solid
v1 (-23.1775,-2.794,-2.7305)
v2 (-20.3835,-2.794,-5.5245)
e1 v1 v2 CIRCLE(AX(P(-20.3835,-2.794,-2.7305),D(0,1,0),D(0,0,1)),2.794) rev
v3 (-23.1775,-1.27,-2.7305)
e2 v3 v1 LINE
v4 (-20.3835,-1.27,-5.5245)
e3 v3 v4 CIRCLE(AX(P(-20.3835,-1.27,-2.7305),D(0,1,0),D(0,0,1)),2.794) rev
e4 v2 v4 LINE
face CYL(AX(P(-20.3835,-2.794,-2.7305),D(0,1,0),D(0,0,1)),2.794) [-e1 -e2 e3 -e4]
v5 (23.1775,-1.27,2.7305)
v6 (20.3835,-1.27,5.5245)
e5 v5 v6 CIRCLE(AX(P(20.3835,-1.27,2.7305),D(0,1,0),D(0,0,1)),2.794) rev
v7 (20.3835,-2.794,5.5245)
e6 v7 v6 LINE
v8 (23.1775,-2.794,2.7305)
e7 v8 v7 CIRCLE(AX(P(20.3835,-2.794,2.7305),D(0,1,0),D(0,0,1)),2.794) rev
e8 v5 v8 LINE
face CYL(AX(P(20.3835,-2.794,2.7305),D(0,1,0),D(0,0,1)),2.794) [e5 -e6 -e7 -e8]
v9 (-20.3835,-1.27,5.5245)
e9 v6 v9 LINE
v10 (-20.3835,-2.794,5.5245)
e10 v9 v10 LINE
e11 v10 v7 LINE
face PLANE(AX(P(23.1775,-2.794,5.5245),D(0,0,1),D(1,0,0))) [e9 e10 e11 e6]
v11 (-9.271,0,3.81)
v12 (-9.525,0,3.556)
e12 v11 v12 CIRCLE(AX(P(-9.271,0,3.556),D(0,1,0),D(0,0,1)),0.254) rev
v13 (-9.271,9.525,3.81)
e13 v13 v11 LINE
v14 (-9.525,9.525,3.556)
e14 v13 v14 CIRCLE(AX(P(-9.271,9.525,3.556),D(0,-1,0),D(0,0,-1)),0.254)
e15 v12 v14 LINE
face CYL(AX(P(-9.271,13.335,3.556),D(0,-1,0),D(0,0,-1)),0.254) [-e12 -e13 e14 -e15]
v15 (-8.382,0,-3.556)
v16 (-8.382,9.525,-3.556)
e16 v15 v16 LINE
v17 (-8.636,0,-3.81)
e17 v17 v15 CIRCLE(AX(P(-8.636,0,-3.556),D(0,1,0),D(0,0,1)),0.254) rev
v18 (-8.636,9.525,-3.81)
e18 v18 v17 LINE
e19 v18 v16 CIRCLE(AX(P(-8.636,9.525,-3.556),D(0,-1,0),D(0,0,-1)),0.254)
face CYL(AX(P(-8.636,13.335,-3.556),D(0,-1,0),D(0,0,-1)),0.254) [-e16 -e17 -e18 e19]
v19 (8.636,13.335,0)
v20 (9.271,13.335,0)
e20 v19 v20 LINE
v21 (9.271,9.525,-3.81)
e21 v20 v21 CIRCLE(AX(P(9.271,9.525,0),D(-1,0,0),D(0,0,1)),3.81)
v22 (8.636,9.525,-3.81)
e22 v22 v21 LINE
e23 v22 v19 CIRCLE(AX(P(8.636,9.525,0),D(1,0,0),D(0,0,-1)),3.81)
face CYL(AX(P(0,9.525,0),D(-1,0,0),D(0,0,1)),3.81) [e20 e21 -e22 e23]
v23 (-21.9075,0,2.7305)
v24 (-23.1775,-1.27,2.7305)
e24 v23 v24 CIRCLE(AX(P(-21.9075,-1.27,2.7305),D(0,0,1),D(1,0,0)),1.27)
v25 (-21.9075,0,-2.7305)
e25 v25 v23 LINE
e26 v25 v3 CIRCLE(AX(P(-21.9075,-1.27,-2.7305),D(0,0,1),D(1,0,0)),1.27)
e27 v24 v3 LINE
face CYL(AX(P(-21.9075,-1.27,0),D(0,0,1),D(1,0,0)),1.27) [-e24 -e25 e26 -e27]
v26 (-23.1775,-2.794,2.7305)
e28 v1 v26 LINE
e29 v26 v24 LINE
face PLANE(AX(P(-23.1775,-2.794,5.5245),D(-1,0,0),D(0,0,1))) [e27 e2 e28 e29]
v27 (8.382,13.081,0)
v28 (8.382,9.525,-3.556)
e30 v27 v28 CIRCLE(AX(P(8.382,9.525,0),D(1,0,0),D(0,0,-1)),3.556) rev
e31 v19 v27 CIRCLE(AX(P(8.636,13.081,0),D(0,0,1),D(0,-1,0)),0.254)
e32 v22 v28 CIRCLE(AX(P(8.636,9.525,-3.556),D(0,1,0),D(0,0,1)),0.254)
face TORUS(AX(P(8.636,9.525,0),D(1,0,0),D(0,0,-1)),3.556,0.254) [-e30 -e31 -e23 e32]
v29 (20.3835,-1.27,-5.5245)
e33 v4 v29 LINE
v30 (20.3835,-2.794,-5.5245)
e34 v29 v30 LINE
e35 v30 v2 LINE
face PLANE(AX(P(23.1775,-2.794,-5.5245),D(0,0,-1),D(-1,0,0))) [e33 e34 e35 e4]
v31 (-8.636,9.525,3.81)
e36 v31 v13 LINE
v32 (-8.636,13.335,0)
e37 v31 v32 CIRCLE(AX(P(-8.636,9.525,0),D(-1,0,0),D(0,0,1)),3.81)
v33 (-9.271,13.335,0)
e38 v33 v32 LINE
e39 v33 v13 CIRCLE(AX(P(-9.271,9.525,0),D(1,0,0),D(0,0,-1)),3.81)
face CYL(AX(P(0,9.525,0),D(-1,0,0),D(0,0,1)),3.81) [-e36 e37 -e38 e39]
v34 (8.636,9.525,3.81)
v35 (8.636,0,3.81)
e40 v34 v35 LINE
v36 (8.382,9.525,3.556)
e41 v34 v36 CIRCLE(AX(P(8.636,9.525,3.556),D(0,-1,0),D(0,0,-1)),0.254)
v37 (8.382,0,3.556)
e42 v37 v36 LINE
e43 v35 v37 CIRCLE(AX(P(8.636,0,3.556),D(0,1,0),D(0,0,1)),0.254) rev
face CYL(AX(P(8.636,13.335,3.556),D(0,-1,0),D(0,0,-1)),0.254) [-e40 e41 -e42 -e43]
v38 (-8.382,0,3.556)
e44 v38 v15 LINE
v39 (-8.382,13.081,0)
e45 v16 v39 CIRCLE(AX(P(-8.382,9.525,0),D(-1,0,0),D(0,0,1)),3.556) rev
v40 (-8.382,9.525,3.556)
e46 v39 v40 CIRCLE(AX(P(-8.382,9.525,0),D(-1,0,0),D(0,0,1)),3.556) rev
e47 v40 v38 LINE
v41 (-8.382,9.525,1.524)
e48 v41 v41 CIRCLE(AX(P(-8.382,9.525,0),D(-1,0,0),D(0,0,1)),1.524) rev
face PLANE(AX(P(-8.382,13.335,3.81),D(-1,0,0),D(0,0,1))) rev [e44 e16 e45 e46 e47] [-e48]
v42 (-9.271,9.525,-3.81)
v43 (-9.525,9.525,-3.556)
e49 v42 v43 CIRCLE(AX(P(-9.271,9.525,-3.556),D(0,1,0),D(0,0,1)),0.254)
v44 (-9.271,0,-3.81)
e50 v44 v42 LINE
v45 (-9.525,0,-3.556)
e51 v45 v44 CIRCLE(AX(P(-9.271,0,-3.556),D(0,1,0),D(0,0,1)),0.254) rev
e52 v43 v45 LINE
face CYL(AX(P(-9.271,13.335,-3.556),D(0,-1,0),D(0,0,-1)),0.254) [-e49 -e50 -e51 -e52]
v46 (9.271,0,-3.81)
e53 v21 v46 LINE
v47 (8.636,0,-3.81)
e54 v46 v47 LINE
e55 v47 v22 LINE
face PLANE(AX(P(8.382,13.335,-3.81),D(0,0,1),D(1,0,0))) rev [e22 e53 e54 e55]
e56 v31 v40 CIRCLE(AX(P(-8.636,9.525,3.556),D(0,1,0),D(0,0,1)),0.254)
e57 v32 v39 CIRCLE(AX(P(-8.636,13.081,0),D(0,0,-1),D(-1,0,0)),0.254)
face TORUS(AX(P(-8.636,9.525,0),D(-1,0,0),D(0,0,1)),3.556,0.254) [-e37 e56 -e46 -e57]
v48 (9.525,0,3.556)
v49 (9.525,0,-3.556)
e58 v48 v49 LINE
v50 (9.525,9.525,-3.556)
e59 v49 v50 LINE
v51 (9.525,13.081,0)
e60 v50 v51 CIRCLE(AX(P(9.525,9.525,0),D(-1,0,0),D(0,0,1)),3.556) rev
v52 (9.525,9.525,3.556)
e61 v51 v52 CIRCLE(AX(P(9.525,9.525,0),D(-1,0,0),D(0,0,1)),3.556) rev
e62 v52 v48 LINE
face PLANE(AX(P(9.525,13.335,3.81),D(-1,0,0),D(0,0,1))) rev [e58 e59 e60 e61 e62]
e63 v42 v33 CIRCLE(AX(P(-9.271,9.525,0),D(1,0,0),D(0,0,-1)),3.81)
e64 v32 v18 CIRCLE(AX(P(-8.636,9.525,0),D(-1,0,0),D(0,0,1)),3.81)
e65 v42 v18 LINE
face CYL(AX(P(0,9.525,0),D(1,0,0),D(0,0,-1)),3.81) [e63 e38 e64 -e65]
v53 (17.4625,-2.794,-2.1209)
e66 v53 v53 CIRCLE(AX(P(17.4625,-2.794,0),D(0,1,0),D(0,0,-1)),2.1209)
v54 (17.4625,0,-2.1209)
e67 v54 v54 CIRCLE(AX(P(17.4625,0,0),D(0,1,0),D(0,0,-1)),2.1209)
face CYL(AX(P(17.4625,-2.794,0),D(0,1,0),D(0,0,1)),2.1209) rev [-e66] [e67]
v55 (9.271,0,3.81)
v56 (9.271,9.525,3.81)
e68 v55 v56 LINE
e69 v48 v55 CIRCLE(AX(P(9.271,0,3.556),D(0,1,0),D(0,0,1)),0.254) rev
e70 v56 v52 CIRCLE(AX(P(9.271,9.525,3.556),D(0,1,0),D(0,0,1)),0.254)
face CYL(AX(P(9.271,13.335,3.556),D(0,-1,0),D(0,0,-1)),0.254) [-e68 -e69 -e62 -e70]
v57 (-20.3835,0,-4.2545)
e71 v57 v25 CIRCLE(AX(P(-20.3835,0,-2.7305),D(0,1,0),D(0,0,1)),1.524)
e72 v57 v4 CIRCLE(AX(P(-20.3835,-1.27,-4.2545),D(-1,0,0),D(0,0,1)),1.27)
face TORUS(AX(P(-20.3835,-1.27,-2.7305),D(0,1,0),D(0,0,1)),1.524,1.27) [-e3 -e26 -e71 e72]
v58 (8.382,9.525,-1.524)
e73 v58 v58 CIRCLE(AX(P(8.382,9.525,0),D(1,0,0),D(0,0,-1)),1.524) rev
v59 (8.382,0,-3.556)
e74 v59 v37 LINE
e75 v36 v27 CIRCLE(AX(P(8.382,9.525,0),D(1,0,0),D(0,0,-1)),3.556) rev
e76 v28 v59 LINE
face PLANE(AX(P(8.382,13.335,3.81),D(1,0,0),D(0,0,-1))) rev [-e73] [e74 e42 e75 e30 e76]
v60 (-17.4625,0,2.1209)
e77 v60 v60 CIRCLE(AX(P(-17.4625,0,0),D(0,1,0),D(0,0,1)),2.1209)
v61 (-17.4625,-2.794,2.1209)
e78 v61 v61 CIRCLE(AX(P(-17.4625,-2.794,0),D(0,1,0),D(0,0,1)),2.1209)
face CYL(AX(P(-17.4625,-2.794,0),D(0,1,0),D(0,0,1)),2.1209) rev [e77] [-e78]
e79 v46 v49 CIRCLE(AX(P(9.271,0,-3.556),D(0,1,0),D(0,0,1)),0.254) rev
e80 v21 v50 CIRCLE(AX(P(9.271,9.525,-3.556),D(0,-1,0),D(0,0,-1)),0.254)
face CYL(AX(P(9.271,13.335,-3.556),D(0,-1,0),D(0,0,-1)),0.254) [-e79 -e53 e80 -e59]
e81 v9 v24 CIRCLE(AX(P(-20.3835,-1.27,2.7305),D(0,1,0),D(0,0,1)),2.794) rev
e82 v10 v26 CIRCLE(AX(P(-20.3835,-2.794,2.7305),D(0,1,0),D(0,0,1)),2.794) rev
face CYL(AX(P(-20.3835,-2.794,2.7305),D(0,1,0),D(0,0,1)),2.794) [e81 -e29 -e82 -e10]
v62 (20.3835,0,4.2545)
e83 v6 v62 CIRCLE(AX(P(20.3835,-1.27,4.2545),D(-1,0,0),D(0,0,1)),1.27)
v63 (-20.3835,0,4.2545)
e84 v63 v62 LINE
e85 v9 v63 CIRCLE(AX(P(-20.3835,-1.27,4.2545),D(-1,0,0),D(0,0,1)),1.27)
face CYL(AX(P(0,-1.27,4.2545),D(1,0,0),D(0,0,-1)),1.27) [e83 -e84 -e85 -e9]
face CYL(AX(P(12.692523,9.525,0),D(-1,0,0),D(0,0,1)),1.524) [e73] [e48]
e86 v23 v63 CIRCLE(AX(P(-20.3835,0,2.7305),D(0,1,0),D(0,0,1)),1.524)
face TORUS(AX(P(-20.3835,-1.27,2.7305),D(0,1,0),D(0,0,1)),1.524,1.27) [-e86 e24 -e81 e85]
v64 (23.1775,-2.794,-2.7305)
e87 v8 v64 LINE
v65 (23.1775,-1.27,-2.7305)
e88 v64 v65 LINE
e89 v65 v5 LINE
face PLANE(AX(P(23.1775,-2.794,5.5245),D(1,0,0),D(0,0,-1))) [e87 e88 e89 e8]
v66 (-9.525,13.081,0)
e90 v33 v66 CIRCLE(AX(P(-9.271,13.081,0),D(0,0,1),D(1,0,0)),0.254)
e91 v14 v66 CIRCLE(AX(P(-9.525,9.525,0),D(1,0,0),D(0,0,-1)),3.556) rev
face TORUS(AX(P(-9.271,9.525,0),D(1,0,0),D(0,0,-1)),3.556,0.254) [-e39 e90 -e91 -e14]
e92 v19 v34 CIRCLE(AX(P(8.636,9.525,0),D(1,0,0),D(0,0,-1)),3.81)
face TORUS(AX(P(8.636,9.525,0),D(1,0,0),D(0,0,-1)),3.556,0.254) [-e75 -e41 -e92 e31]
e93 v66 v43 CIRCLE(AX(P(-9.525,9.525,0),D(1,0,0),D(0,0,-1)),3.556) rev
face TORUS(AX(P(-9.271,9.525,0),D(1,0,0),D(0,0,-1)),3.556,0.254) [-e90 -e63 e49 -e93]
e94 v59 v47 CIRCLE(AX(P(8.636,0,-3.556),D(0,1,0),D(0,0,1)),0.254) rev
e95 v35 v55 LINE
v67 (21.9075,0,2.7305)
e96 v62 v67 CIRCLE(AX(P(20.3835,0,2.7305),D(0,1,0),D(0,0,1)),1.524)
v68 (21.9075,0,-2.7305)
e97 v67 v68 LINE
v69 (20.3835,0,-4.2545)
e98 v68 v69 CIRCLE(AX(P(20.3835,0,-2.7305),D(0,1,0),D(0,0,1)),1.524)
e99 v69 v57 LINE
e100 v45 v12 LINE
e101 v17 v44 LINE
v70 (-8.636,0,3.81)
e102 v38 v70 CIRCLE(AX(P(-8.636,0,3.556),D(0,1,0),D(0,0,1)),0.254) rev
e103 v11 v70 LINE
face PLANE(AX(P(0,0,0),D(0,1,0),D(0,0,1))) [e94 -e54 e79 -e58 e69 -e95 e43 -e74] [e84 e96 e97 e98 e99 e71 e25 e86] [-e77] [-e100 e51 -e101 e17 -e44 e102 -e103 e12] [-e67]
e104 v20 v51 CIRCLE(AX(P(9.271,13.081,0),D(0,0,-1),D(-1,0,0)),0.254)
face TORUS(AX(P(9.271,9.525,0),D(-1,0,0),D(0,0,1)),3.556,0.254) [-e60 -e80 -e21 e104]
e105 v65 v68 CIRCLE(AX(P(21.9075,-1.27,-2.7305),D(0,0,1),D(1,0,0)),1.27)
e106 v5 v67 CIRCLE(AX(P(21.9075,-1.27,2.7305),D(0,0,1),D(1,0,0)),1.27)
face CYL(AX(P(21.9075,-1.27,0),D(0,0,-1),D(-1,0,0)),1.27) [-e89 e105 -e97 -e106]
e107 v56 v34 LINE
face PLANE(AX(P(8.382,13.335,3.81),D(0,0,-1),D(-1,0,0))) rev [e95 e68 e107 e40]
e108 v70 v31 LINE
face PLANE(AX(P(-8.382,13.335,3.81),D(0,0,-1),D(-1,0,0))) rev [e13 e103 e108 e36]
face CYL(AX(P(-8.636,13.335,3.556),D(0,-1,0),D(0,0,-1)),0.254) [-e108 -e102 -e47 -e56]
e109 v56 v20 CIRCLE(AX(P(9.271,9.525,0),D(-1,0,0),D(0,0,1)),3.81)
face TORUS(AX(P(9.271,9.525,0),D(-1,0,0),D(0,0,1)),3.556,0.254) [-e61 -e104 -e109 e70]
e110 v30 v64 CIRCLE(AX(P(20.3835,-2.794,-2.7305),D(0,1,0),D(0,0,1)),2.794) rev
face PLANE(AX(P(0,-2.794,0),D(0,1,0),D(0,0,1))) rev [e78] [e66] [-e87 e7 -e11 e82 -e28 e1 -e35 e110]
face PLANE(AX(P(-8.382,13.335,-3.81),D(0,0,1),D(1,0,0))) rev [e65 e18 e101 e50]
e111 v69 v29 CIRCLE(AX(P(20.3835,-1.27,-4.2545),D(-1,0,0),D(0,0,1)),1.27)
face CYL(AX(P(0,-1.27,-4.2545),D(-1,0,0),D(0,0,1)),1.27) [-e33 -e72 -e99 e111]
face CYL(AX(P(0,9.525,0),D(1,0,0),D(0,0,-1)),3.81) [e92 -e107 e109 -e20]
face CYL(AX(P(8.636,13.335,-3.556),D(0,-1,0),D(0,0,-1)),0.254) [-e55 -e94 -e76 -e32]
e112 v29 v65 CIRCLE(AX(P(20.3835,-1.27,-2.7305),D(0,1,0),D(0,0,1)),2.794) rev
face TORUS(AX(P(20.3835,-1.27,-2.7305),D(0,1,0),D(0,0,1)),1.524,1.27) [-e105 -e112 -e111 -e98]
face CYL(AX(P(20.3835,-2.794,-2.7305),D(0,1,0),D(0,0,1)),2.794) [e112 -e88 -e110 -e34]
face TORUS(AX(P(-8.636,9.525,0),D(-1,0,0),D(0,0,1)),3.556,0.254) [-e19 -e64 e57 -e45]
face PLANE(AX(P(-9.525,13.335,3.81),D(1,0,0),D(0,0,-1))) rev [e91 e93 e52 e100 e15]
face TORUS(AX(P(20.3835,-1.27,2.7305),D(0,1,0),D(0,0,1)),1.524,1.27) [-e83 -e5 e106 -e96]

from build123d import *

# Parameters (mm, degrees)
SKETCH1_W           = 46.355
SKETCH1_H           = 11.049
SKETCH1_R           = 2.1209
BOSS_EXTRUDE1_DEPTH = 2.794
SKETCH2_W           = 1.143
SKETCH2_H           = 7.62
BOSS_EXTRUDE2_DEPTH = 13.335
FILLET1_R           = 3.81
SKETCH3_R           = 1.524
BOSS_EXTRUDE3_DEPTH = 16.764
FILLET2_R           = 2.794
FILLET3_R           = 1.27
FILLET4_R           = 0.254


with BuildPart() as part:
    # Sketch1 → Boss-Extrude1 (new body)
    with BuildSketch(Plane(origin=(0, 0, 0), x_dir=(1, 0, 0), z_dir=(0, 1, 0))):
        Rectangle(SKETCH1_W, SKETCH1_H)
        with Locations(Location((-17.4625, 0, 0), (0, 0, 270))):
            Circle(SKETCH1_R, mode=Mode.SUBTRACT)
        with Locations(Location((17.4625, 0, 0), (0, 0, 90))):
            Circle(SKETCH1_R, mode=Mode.SUBTRACT)
    extrude(amount=-BOSS_EXTRUDE1_DEPTH)

    # Sketch2 → Boss-Extrude2 (add)
    with BuildSketch(Plane(origin=(0, 0, 0), x_dir=(1, 0, 0), z_dir=(0, 1, 0))):
        with Locations((8.9535, 0)):
            Rectangle(SKETCH2_W, SKETCH2_H)
        with Locations((-8.9535, 0)):
            Rectangle(SKETCH2_W, SKETCH2_H)
    extrude(amount=BOSS_EXTRUDE2_DEPTH)

    # Fillet1
    fillet1_edges = [part.edges().sort_by_distance(p)[0] for p in [
        (-8.9535, 13.335, -3.81),
        (-8.9535, 13.335, 3.81),
        (8.9535, 13.335, -3.81),
        (8.9535, 13.335, 3.81),
    ]]
    fillet(fillet1_edges, radius=FILLET1_R - 0.0001)  # a hair under: the kernel refuses the full size

    # Sketch3 → Boss-Extrude3 (add)
    with BuildSketch(Plane(origin=(-8.382, 0, 0), x_dir=(0, 0, -1), z_dir=(1, 0, 0))):
        with Locations(Location((0, 9.525, 0), (0, 0, 180))):
            Circle(SKETCH3_R)
    extrude(amount=BOSS_EXTRUDE3_DEPTH)

    # Fillet2
    fillet2_edges = [part.edges().sort_by_distance(p)[0] for p in [
        (-23.1775, -1.397, -5.5245),
        (23.1775, -1.397, -5.5245),
        (23.1775, -1.397, 5.5245),
        (-23.1775, -1.397, 5.5245),
    ]]
    fillet(fillet2_edges, radius=FILLET2_R)

    # Fillet3
    fillet3_edges = [part.edges().sort_by_distance(p)[0] for p in [
        (0, 0, 5.5245),
        (-23.1775, 0, 0),
        (23.1775, 0, 0),
        (0, 0, -5.5245),
        (-22.359156347, 0, 4.706156347),
        (-22.359156347, 0, -4.706156347),
        (22.359156347, 0, -4.706156347),
        (22.359156347, 0, 4.706156347),
    ]]
    fillet(fillet3_edges, radius=FILLET3_R)

    # Fillet4
    fillet4_edges = [part.edges().sort_by_distance(p)[0] for p in [
        (-9.525, 4.76255, 3.81),
        (-9.525, 4.76255, -3.81),
        (-9.525, 12.219106126, 2.694106126),
        (-9.525, 12.219106126, -2.694106126),
        (-8.382, 4.76255, -3.81),
        (-8.382, 4.76255, 3.81),
        (-8.382, 12.219106126, 2.694106126),
        (-8.382, 12.219106126, -2.694106126),
        (8.382, 4.76255, 3.81),
        (8.382, 4.76255, -3.81),
        (8.382, 12.219106126, 2.694106126),
        (8.382, 12.219106126, -2.694106126),
        (9.525, 4.76255, -3.81),
        (9.525, 4.76255, 3.81),
        (9.525, 12.219106126, 2.694106126),
        (9.525, 12.219106126, -2.694106126),
    ]]
    fillet(fillet4_edges, radius=FILLET4_R)


solid = part.part
